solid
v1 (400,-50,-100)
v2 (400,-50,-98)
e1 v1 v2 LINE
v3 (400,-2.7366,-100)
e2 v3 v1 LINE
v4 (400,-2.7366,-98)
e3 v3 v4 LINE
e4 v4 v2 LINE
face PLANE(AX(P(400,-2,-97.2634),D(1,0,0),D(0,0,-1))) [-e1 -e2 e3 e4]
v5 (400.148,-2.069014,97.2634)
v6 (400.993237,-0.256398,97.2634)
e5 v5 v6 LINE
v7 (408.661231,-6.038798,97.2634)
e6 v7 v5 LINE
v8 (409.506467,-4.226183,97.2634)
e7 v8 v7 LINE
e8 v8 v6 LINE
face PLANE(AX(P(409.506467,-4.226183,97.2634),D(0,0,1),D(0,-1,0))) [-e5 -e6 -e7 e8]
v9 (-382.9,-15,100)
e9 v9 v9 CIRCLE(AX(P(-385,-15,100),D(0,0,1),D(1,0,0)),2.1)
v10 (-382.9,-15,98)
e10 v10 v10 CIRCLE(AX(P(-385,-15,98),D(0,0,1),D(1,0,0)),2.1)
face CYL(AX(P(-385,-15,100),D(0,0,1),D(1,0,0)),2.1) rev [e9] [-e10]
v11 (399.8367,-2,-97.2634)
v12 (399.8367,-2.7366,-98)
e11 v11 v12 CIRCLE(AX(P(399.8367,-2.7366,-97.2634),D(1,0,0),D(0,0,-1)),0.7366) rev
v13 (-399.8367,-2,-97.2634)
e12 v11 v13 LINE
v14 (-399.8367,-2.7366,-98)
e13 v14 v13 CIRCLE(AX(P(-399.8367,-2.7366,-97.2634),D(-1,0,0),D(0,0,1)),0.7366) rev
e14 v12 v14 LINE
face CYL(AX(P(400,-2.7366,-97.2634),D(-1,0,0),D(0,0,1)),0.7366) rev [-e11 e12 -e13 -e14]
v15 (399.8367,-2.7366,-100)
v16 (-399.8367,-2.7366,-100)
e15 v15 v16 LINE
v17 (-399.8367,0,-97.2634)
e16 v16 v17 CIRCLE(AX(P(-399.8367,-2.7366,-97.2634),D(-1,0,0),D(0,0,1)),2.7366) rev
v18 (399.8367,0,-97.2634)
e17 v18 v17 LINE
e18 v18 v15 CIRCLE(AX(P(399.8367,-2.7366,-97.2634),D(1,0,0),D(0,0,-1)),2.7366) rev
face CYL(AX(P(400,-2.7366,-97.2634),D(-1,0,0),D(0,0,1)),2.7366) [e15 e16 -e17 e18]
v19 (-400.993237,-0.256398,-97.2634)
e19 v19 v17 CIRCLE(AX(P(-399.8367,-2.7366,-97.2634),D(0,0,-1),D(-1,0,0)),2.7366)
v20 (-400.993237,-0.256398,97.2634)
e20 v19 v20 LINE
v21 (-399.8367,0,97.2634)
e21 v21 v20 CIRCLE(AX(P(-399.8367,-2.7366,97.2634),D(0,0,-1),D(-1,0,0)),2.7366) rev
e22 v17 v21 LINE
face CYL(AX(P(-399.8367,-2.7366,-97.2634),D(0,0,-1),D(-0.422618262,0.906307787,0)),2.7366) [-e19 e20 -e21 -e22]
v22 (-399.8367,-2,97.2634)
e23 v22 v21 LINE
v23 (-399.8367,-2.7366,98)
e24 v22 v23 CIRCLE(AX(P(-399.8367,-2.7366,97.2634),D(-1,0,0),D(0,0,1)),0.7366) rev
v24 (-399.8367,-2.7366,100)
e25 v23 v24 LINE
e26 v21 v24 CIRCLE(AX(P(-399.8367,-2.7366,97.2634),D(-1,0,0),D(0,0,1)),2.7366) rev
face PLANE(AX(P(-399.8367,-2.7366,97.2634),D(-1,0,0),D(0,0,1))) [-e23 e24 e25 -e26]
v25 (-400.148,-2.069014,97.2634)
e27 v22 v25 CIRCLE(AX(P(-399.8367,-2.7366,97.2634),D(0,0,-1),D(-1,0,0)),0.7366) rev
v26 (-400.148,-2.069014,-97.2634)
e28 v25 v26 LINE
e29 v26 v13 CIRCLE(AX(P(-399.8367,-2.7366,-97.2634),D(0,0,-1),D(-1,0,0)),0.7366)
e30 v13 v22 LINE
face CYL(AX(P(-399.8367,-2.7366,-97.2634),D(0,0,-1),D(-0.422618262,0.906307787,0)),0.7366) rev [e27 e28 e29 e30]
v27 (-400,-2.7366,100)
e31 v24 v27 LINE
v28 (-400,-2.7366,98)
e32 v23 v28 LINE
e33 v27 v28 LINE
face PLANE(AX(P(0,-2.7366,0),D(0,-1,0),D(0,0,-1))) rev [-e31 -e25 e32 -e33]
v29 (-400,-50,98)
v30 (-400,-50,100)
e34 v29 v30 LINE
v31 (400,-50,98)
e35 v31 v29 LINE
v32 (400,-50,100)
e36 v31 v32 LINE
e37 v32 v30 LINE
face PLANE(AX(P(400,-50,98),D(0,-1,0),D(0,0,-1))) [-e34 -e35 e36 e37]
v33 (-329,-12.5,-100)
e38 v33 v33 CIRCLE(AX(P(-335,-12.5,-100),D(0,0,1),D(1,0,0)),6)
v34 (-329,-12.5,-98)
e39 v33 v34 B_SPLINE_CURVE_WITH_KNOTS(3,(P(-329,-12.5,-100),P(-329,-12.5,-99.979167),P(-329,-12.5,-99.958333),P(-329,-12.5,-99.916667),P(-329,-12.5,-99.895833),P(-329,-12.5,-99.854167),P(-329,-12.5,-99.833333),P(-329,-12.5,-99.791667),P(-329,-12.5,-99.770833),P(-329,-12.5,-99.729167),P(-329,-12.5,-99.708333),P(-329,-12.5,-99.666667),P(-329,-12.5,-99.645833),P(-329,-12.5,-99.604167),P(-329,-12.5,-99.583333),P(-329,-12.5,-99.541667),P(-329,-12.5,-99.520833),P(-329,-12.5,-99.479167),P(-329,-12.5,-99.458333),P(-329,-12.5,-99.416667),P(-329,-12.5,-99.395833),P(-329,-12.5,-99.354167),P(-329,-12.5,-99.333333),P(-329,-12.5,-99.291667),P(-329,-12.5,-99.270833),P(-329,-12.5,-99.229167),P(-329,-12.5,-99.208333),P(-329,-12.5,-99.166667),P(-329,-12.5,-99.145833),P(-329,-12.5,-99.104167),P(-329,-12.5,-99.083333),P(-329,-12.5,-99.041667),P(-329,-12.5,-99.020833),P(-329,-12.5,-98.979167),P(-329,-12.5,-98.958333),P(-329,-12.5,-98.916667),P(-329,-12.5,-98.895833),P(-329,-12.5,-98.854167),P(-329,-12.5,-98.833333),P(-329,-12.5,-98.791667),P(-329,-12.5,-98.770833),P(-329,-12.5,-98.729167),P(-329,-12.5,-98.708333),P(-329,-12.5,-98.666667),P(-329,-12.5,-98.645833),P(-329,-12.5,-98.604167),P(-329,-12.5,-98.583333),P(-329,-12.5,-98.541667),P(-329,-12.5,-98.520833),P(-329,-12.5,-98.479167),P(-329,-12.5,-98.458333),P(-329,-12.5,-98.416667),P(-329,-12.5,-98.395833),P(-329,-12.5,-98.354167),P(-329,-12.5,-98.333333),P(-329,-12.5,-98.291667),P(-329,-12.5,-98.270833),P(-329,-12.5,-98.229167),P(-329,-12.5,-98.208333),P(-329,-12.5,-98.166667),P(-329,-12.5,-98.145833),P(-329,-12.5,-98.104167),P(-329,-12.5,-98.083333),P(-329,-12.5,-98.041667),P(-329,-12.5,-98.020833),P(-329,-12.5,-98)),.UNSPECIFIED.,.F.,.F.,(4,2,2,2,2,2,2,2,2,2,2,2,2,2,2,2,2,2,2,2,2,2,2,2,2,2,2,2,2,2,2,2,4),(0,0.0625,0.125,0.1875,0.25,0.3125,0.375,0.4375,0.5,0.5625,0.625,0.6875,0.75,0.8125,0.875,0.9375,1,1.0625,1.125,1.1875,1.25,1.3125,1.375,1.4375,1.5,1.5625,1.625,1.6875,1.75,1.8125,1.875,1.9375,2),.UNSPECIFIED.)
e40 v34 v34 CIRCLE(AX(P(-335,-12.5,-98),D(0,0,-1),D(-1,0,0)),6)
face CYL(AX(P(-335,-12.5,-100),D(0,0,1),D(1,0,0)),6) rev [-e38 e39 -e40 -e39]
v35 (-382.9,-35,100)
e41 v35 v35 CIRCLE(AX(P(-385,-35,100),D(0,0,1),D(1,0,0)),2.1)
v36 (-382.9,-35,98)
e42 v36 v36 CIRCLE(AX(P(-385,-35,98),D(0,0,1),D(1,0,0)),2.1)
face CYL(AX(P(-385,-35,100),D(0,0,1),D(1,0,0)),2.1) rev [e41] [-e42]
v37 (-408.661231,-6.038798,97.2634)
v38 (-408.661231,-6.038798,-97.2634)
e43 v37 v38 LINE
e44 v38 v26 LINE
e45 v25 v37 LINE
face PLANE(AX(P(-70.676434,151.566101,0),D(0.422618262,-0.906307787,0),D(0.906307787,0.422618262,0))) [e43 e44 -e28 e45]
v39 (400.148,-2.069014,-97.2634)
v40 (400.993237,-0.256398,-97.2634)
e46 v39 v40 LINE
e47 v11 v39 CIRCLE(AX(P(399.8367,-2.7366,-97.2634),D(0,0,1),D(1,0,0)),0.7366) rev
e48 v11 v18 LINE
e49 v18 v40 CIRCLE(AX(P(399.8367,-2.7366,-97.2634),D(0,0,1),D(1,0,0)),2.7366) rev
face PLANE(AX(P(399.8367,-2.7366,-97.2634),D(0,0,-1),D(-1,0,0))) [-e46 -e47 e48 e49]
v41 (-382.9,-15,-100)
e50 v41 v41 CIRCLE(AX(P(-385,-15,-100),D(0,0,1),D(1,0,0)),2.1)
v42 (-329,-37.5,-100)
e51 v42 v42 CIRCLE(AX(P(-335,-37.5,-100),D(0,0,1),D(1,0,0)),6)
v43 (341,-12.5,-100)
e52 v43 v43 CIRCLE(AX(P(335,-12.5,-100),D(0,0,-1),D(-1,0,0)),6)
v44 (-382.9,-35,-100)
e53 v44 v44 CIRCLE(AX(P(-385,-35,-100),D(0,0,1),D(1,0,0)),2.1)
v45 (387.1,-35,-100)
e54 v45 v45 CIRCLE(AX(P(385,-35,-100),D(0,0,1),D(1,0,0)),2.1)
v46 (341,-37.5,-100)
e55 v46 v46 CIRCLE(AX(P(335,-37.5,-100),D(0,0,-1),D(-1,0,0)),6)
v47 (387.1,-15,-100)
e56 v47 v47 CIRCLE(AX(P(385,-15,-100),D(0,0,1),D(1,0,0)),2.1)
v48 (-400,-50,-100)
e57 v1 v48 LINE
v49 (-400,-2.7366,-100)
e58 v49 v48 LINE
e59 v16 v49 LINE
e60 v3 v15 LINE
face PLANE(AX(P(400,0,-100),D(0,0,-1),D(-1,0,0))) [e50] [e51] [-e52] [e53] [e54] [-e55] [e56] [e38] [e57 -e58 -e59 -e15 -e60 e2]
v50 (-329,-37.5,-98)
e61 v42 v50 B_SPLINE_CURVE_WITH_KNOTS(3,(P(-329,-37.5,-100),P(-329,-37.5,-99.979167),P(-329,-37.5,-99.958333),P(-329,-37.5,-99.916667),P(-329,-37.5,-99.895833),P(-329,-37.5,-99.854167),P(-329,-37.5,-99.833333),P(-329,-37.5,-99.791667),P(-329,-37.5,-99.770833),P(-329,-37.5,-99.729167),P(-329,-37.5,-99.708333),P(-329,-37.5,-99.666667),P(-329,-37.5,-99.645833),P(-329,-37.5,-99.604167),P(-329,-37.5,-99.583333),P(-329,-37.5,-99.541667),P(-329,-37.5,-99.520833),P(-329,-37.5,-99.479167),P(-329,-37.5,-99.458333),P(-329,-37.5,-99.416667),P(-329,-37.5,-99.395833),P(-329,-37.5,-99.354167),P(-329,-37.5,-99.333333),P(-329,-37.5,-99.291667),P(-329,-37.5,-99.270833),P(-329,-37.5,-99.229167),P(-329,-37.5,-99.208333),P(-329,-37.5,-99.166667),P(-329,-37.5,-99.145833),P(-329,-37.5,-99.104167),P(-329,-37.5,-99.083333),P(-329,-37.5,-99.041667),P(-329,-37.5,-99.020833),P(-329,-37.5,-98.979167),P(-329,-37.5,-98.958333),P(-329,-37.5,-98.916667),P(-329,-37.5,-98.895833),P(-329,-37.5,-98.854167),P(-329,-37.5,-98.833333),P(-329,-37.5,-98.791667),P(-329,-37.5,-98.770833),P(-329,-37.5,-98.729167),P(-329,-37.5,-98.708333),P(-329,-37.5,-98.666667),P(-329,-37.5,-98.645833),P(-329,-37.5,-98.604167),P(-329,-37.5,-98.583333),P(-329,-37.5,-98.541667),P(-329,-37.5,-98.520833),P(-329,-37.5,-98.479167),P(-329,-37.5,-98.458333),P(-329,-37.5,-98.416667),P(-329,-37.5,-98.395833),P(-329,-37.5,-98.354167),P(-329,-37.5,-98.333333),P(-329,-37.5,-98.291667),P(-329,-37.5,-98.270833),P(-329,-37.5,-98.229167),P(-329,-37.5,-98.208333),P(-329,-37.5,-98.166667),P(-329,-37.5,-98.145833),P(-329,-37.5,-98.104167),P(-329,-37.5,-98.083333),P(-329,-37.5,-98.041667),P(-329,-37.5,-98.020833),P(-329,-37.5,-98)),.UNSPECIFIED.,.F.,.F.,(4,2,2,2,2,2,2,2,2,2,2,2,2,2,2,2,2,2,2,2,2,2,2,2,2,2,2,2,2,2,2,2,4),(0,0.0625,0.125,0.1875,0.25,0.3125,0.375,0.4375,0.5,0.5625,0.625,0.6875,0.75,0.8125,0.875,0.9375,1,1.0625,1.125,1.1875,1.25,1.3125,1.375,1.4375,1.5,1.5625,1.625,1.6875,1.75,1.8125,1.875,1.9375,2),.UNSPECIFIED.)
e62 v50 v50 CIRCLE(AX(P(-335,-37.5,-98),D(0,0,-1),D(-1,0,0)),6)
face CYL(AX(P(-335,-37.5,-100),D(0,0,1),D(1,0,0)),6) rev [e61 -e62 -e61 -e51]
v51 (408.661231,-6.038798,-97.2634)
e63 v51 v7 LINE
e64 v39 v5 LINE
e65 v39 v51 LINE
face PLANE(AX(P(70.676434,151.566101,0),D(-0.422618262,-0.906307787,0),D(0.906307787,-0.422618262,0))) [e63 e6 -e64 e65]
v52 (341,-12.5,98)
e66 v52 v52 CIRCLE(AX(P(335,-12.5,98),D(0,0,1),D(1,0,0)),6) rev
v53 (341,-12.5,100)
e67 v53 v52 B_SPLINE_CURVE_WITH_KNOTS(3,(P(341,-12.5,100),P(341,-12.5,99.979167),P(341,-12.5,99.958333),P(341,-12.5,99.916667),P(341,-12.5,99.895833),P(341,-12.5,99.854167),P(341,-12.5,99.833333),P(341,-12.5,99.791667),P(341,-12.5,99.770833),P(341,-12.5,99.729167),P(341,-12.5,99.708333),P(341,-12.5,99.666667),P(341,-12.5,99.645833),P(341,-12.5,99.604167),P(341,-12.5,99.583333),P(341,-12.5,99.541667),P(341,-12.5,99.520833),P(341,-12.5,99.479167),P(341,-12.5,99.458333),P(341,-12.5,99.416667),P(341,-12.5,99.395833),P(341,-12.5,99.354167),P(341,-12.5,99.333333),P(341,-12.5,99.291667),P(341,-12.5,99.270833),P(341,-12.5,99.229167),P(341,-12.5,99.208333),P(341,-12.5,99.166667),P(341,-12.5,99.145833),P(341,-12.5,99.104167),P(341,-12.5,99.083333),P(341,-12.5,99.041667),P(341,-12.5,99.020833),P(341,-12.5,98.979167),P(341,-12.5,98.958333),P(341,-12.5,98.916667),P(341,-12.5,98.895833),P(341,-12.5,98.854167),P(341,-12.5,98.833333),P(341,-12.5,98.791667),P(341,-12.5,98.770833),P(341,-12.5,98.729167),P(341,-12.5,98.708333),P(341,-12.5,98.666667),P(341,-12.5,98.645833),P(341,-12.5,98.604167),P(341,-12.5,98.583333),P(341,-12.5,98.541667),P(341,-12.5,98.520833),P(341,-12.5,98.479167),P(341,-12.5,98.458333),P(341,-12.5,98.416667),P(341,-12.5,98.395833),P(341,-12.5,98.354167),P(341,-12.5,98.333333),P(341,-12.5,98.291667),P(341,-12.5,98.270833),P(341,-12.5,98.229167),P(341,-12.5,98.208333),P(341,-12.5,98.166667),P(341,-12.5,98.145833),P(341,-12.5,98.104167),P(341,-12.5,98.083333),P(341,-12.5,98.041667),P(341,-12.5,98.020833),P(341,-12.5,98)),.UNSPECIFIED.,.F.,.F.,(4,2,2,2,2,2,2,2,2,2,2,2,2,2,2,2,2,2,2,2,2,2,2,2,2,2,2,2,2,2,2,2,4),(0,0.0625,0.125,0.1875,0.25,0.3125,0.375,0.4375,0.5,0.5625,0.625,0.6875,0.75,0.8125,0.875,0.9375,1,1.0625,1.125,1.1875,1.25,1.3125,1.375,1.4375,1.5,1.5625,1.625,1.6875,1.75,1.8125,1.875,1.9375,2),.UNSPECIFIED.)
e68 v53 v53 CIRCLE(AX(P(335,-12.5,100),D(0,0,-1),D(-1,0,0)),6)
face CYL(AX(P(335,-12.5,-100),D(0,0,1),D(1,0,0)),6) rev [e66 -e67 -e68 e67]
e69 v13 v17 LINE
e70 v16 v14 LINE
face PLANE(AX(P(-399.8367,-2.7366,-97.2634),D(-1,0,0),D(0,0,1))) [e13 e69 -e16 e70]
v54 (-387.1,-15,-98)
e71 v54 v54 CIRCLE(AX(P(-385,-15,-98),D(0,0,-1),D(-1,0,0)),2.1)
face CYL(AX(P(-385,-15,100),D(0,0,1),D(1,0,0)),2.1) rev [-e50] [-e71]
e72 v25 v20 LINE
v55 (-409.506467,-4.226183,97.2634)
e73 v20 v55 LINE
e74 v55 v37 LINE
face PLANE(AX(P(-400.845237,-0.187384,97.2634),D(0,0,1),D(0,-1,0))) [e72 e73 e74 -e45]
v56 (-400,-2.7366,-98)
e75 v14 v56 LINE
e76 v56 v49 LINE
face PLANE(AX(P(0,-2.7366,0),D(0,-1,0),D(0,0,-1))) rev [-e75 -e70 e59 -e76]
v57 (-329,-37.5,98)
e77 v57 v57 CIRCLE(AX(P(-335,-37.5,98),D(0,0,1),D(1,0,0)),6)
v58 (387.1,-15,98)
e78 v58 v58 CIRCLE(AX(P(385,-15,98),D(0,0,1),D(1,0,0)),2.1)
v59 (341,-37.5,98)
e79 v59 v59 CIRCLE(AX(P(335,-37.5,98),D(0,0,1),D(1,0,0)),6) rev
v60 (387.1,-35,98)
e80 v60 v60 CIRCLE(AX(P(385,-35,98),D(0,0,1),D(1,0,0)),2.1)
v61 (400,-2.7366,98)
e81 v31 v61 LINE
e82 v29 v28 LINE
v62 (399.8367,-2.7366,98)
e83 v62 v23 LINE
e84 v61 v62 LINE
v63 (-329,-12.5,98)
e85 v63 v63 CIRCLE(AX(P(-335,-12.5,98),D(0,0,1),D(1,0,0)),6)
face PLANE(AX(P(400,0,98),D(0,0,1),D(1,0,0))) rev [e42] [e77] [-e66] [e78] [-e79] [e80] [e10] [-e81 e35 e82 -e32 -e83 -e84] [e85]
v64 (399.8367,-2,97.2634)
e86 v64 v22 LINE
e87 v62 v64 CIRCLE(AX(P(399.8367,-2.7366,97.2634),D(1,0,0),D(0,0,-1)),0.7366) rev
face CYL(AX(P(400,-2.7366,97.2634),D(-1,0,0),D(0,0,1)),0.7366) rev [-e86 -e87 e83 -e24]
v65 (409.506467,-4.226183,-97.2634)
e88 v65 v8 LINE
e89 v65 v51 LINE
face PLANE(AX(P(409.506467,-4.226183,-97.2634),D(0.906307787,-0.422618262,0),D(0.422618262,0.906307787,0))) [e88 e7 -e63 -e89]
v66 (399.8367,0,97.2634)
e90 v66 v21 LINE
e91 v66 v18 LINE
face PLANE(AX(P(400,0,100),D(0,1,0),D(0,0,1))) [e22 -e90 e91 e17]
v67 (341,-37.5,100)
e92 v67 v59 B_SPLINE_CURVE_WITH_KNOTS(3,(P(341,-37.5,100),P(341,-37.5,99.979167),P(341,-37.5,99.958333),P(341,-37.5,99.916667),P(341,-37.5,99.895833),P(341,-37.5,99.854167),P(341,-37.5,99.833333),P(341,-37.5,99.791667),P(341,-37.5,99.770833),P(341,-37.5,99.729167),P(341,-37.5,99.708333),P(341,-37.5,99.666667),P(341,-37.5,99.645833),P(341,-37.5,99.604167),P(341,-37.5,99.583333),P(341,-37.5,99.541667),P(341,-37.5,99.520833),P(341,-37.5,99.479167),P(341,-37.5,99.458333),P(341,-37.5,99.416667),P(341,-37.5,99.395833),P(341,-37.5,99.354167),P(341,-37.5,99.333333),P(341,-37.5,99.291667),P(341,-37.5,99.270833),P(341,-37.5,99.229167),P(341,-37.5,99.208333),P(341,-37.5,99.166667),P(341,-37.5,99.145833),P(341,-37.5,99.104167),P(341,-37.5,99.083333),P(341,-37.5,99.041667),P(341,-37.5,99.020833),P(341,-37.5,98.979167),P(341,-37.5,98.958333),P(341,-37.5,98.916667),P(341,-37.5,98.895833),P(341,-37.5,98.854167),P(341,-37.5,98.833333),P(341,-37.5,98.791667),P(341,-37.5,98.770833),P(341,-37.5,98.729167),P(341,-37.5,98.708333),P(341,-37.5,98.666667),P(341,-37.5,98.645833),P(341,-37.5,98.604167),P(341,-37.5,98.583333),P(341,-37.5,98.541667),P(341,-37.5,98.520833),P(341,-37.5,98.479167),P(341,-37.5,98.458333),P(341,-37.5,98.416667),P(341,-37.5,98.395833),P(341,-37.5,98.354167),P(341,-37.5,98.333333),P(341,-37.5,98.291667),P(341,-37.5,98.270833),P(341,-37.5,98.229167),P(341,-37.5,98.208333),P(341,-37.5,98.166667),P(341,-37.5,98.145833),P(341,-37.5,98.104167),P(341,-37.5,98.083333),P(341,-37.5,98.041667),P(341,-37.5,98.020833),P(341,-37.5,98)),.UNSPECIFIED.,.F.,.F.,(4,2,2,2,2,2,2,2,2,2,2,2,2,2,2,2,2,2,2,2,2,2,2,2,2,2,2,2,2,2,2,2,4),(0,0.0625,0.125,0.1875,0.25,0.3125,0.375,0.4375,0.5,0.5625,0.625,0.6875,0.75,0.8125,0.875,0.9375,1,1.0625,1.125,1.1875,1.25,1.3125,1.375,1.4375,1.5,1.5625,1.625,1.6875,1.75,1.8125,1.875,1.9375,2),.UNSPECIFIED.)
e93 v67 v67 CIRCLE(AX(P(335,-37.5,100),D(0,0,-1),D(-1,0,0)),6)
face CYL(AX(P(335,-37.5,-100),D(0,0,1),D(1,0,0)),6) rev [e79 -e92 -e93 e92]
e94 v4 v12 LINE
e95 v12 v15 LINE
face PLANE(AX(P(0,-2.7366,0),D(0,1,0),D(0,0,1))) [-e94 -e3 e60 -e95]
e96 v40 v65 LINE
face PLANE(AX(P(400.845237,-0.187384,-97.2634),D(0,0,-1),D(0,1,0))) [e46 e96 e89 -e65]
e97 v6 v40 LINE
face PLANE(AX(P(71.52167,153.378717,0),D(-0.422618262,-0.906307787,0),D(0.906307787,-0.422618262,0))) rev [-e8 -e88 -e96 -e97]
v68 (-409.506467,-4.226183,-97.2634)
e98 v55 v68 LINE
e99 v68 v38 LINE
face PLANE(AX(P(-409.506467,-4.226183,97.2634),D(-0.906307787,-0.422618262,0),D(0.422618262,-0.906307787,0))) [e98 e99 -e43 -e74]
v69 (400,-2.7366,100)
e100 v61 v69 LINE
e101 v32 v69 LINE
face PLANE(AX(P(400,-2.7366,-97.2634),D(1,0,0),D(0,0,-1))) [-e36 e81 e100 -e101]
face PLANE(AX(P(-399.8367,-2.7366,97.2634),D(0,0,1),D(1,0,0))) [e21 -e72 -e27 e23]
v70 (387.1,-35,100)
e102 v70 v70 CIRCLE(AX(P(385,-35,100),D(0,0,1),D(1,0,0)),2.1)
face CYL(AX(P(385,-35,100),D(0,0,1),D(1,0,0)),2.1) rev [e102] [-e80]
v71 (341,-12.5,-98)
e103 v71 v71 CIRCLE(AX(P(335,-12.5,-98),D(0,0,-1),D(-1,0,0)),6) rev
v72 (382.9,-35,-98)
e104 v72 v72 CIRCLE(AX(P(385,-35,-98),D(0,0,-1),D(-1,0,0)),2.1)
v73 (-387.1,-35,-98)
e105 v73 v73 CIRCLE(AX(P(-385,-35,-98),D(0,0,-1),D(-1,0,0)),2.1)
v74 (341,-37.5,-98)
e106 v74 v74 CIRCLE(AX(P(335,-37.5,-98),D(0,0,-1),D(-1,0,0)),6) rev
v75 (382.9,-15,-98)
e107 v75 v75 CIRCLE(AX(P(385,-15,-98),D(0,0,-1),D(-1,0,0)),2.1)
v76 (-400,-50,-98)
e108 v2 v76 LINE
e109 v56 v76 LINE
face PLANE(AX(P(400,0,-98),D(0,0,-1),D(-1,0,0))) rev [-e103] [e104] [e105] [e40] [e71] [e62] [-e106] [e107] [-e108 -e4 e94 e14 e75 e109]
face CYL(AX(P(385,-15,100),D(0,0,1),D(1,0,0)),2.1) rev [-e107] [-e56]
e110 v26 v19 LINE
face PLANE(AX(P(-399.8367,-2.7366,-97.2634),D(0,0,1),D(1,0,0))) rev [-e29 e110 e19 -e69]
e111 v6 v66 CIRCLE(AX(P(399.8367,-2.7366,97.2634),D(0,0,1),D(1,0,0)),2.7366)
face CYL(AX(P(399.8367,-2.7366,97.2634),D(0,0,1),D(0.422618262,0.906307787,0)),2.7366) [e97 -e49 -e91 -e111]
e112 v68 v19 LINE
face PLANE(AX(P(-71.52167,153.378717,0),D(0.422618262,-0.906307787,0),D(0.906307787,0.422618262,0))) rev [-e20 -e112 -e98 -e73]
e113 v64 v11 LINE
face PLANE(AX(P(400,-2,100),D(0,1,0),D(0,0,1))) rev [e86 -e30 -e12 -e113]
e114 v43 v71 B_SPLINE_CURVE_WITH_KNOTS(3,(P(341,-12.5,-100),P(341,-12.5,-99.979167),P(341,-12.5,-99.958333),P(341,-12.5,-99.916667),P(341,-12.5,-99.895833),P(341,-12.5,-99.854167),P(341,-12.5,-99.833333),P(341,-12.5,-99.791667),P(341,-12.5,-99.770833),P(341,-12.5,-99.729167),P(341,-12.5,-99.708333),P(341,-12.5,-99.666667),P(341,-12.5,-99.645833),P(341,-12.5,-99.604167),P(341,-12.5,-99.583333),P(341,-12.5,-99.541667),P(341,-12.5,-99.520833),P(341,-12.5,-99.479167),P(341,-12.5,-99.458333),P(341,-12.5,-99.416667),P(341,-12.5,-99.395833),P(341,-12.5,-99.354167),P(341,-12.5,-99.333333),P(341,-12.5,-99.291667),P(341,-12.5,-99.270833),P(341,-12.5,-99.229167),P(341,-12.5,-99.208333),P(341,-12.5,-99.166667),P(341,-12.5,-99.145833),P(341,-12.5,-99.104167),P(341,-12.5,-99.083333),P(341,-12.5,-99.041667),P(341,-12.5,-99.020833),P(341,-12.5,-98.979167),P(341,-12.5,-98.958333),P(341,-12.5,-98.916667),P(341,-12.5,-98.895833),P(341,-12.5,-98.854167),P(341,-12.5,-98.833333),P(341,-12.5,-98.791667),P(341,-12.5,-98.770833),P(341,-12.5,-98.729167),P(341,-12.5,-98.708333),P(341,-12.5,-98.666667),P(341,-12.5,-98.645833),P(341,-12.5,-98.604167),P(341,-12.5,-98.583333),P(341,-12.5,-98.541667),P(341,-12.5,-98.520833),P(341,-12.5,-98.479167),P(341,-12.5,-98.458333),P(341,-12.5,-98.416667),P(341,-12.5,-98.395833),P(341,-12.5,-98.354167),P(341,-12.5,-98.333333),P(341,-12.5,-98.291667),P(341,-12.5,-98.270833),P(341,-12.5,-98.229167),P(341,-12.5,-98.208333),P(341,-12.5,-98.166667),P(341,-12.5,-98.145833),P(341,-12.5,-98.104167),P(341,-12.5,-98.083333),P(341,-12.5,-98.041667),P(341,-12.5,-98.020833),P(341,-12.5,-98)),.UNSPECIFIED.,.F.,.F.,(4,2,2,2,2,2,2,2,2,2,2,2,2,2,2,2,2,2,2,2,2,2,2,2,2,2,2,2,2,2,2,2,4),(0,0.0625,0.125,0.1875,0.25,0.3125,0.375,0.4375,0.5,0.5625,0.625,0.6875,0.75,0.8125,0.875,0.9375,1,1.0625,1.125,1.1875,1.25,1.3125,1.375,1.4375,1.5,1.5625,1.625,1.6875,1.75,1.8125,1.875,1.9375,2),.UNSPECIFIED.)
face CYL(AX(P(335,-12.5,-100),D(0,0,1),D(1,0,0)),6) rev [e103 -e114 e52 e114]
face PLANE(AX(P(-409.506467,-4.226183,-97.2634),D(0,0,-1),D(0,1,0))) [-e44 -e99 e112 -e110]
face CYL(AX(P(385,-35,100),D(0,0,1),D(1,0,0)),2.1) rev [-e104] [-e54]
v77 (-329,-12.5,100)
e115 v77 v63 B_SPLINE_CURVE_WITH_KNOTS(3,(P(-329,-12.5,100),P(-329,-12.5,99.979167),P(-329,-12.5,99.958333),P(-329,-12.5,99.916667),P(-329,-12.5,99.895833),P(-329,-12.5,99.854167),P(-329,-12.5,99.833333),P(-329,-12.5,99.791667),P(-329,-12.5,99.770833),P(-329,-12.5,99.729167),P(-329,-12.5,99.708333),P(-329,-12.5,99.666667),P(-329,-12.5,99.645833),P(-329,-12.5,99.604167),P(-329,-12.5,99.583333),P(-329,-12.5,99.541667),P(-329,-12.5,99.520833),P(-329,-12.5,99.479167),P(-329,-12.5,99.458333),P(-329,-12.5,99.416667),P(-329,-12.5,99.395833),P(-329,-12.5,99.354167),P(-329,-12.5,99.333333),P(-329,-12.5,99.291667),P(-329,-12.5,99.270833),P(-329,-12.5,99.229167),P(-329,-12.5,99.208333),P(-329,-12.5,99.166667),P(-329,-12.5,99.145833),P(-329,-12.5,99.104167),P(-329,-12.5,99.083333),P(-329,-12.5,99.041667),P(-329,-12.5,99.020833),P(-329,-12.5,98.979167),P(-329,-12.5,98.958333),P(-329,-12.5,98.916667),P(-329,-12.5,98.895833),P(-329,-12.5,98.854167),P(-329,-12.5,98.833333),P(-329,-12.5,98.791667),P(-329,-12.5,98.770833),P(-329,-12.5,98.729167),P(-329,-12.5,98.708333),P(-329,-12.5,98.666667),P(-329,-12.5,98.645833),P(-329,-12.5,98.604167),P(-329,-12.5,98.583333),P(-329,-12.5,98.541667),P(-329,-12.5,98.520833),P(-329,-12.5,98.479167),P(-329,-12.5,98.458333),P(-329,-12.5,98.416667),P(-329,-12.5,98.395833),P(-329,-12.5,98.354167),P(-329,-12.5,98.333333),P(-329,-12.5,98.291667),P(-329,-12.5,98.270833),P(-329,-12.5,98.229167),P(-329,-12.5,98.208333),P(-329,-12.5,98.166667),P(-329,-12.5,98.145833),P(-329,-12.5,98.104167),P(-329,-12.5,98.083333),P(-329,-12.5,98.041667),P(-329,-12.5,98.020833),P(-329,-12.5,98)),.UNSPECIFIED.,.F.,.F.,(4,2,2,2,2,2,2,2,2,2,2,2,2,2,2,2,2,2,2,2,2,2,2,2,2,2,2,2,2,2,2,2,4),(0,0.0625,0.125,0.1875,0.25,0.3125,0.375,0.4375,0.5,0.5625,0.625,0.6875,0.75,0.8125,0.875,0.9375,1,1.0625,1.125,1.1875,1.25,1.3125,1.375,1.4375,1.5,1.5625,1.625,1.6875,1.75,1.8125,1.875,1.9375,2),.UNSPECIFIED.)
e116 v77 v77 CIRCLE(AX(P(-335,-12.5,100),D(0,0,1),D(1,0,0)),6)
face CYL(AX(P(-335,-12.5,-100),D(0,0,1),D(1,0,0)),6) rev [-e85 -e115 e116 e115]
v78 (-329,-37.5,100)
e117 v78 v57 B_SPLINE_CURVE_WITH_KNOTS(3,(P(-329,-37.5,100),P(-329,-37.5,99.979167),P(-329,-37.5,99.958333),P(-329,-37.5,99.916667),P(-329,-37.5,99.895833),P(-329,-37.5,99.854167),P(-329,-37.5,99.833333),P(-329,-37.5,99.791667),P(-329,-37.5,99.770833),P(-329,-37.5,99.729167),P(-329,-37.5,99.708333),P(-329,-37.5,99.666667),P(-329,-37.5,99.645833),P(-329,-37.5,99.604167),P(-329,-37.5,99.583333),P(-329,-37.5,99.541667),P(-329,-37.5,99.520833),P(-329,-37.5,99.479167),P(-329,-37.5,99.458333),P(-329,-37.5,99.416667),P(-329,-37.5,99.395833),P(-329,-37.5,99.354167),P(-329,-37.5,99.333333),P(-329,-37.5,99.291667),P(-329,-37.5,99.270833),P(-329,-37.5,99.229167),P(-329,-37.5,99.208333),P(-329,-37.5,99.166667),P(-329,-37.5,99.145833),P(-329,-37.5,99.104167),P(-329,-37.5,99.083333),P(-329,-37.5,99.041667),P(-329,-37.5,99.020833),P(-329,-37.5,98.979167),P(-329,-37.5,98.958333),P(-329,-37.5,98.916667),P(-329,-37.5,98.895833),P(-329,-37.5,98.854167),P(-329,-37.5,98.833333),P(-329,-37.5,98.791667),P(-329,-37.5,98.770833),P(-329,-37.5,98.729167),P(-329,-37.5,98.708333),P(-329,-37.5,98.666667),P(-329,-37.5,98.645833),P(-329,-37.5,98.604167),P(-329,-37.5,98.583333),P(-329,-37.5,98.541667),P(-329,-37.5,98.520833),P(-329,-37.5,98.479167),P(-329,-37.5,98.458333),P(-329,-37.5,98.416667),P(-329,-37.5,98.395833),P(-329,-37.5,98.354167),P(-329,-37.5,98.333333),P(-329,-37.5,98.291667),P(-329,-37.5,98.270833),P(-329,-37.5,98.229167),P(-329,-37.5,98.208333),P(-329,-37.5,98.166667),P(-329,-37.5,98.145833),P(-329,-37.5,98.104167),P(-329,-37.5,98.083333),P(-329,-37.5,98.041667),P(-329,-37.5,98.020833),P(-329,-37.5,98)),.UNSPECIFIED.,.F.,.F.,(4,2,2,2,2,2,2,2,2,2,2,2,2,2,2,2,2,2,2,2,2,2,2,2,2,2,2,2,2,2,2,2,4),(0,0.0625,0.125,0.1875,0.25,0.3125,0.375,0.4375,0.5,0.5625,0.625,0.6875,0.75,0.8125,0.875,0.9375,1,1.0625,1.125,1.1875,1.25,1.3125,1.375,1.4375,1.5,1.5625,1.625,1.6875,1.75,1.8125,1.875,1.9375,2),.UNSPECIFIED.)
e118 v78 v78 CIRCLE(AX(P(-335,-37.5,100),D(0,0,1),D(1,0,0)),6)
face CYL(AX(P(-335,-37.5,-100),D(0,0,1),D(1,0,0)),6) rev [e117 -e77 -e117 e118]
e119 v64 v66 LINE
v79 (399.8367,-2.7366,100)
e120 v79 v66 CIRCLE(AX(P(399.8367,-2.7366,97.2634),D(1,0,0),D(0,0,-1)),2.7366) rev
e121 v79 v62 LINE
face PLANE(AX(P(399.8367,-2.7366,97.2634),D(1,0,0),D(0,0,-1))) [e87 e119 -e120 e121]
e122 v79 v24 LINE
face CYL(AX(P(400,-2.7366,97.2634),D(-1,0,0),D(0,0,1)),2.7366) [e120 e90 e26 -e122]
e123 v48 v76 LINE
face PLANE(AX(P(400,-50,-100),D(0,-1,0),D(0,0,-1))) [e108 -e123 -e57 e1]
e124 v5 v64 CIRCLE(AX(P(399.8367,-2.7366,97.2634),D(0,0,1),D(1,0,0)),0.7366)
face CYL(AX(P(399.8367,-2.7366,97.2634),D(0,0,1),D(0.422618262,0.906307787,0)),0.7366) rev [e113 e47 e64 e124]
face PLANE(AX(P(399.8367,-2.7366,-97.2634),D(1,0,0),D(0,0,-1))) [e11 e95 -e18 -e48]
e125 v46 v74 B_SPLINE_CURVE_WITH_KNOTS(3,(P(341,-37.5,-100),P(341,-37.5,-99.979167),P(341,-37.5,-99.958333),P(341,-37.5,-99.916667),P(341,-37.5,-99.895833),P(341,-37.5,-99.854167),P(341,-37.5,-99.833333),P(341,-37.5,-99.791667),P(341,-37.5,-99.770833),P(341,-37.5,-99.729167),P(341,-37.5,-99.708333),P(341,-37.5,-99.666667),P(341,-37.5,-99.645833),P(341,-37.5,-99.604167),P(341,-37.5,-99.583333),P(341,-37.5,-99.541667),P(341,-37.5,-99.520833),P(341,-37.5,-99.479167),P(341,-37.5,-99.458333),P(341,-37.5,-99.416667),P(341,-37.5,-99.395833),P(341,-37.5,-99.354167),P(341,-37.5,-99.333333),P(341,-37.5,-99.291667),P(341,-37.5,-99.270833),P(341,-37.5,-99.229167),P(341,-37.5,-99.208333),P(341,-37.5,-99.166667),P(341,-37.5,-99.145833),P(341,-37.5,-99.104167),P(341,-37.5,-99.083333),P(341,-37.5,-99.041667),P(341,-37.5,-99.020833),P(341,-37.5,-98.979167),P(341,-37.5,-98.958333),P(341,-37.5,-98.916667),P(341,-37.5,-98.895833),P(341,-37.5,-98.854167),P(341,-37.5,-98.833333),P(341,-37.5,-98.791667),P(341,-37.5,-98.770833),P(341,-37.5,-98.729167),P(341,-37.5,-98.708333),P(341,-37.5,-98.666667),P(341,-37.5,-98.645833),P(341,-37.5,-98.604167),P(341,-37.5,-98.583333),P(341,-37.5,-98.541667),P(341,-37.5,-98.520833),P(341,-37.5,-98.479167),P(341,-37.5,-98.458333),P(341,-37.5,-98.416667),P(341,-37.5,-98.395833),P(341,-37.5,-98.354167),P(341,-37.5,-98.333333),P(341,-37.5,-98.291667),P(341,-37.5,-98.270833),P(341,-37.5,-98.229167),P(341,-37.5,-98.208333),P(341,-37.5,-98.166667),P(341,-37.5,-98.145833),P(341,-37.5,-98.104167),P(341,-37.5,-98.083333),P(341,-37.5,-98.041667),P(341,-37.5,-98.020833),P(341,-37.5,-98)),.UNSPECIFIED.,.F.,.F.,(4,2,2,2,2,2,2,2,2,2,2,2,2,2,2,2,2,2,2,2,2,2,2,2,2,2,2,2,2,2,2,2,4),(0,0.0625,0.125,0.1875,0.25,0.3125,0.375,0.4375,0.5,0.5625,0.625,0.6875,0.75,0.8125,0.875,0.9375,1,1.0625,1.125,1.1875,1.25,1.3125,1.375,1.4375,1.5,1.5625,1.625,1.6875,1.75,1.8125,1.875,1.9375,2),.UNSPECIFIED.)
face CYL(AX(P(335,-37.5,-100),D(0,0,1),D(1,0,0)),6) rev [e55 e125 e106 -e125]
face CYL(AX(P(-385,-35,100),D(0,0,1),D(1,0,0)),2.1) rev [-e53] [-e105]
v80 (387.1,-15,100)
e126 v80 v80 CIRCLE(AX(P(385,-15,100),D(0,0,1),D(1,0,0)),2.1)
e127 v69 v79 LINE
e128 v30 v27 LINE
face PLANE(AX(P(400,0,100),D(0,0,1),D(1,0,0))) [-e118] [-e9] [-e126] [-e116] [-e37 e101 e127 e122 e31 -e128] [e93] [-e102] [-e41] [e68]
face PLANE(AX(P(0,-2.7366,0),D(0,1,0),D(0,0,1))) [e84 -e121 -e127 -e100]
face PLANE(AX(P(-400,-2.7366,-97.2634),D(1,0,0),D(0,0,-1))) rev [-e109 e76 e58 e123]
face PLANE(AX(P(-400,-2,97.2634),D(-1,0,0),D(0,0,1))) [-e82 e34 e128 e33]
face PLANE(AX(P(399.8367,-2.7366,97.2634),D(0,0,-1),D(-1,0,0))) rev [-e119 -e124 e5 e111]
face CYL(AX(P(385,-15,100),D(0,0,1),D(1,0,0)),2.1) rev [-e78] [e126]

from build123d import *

# Parameters (mm, degrees)
TABAN_FLAN_1_DEPTH       = 400
M5_DI_LI_DELIK1_D        = 4.2
IZIM10_R                 = 6
KES_EKSTR_ZYON1_DEPTH    = 451
KENAR_FLAN_1_START       = -100
KENAR_FLAN_1_OUTLINE_W   = 0.163300289
KENAR_FLAN_1_OUTLINE_H   = 2.7366
KENAR_FLAN_1_DEPTH       = 2.7366
KENAR_FLAN_1_START_2     = 97.2634
KENAR_FLAN_1_2_OUTLINE_W = 0.163300289
KENAR_FLAN_1_2_OUTLINE_H = 2.7366
KENAR_FLAN_1_2_DEPTH     = 2.7366
KENAR_FLAN_1_START_3     = -97.2634
KENAR_FLAN_1_3_DEPTH     = 194.5268
KENAR_FLAN_1_4_DEPTH     = 194.5268


# Read off the part's stored shape, not the designer's step: Kenar-Flanş1
# Sheet-metal steps are written as plain solids
with BuildPart() as part:
    # Çizim1 → Taban-Flanş1 (new, symmetric)
    with BuildSketch(Plane(origin=(0, 0, 0), x_dir=(0, 0, -1), z_dir=(1, 0, 0))):
        with BuildLine():
            Line((-100, -50), (-100, -2.7366))
            ThreePointArc((-100, -2.7366), (-99.198468417, -0.801531583), (-97.2634, 0))
            Line((-97.2634, 0), (97.2634, 0))
            ThreePointArc((97.2634, 0), (99.198468417, -0.801531583), (100, -2.7366))
            Line((100, -2.7366), (100, -50))
            Line((100, -50), (98, -50))
            Line((98, -50), (98, -2.7366))
            ThreePointArc((98, -2.7366), (97.784254855, -2.215745145), (97.2634, -2))
            Line((97.2634, -2), (-97.2634, -2))
            ThreePointArc((-97.2634, -2), (-97.784254855, -2.215745145), (-98, -2.7366))
            Line((-98, -2.7366), (-98, -50))
            Line((-98, -50), (-100, -50))
        make_face()
    extrude(amount=TABAN_FLAN_1_DEPTH, both=True)

    # M5 Dişli Delik1 (through all)
    with Locations(Plane(origin=(-385, -15, 100), x_dir=(1, 0, 0), z_dir=(0, 0, 1))):
        with Locations((0, 0), (0, -20)):
            m5_di_li_delik1 = Hole(M5_DI_LI_DELIK1_D / 2)

    # Çizim10 → Kes-Ekstrüzyon1 (cut, through all)
    with BuildSketch(Plane.XY.offset(100)):
        with Locations((-335, -12.5)):
            Circle(IZIM10_R)
        with Locations((-335, -37.5)):
            Circle(IZIM10_R)
    kes_ekstr_zyon1 = extrude(amount=-KES_EKSTR_ZYON1_DEPTH, mode=Mode.SUBTRACT)

    # Aynalama1: M5 Dişli Delik1, Kes-Ekstrüzyon1 across plane
    add(m5_di_li_delik1.mirror(Plane(origin=(0, 0, 0), x_dir=(0, 0, 1), z_dir=(1, 0, 0))), mode=Mode.SUBTRACT)
    add(kes_ekstr_zyon1.mirror(Plane(origin=(0, 0, 0), x_dir=(0, 0, 1), z_dir=(1, 0, 0))), mode=Mode.SUBTRACT)

    # Kenar-Flanş1 outline → Kenar-Flanş1 (cut)
    with BuildSketch(Plane.XY.offset(KENAR_FLAN_1_START)):
        with Locations((399.918349856, -1.3683)):
            Rectangle(KENAR_FLAN_1_OUTLINE_W, KENAR_FLAN_1_OUTLINE_H)
        with Locations((-399.918349856, -1.3683)):
            Rectangle(KENAR_FLAN_1_OUTLINE_W, KENAR_FLAN_1_OUTLINE_H)
    extrude(amount=KENAR_FLAN_1_DEPTH, mode=Mode.SUBTRACT)

    # Kenar-Flan_1 2 outline → Kenar-Flan_1 2 (cut)
    with BuildSketch(Plane.XY.offset(KENAR_FLAN_1_START_2)):
        with Locations((399.918349856, -1.3683)):
            Rectangle(KENAR_FLAN_1_2_OUTLINE_W, KENAR_FLAN_1_2_OUTLINE_H)
        with Locations((-399.918349856, -1.3683)):
            Rectangle(KENAR_FLAN_1_2_OUTLINE_W, KENAR_FLAN_1_2_OUTLINE_H)
    extrude(amount=KENAR_FLAN_1_2_DEPTH, mode=Mode.SUBTRACT)

    # Kenar-Flan_1 3 outline → Kenar-Flan_1 3 (cut)
    with BuildSketch(Plane.XY.offset(KENAR_FLAN_1_START_3)):
        with BuildLine():
            Line((400, 0), (399.836699711, 0))
            ThreePointArc((399.836699711, 0), (399.918386255, -0.001219429), (400, -0.004876629))
            Line((400, -0.004876629), (400, 0))
        make_face()
        with BuildLine():
            ThreePointArc((-400, -0.004876629), (-399.918386255, -0.001219429), (-399.836699711, 0))
            Line((-399.836699711, 0), (-400, 0))
            Line((-400, 0), (-400, -0.004876629))
        make_face()
    extrude(amount=KENAR_FLAN_1_3_DEPTH, mode=Mode.SUBTRACT)

    # Kenar-Flan_1 4 outline → Kenar-Flan_1 4 (add)
    with BuildSketch(Plane.XY.offset(KENAR_FLAN_1_START_3)):
        with BuildLine():
            Line((400, -0.004876629), (400, -2))
            Line((400, -2), (399.836699711, -2))
            ThreePointArc((399.836699711, -2), (399.996129131, -2.017460361), (400.148000323, -2.069013684))
            Line((400.148000323, -2.069013684), (408.661230672, -6.038798191))
            Line((408.661230672, -6.038798191), (409.506467196, -4.226182617))
            Line((409.506467196, -4.226182617), (400.993236847, -0.25639811))
            ThreePointArc((400.993236847, -0.25639811), (400.508494673, -0.083739075), (400, -0.004876629))
        make_face()
        with BuildLine():
            Line((-399.836699711, -2), (-400, -2))
            Line((-400, -2), (-400, -0.004876629))
            ThreePointArc((-400, -0.004876629), (-400.508494673, -0.083739075), (-400.993236847, -0.25639811))
            Line((-400.993236847, -0.25639811), (-409.506467196, -4.226182617))
            Line((-409.506467196, -4.226182617), (-408.661230672, -6.038798191))
            Line((-408.661230672, -6.038798191), (-400.148000323, -2.069013684))
            ThreePointArc((-400.148000323, -2.069013684), (-399.996129131, -2.017460361), (-399.836699711, -2))
        make_face()
    extrude(amount=KENAR_FLAN_1_4_DEPTH)


solid = part.part
